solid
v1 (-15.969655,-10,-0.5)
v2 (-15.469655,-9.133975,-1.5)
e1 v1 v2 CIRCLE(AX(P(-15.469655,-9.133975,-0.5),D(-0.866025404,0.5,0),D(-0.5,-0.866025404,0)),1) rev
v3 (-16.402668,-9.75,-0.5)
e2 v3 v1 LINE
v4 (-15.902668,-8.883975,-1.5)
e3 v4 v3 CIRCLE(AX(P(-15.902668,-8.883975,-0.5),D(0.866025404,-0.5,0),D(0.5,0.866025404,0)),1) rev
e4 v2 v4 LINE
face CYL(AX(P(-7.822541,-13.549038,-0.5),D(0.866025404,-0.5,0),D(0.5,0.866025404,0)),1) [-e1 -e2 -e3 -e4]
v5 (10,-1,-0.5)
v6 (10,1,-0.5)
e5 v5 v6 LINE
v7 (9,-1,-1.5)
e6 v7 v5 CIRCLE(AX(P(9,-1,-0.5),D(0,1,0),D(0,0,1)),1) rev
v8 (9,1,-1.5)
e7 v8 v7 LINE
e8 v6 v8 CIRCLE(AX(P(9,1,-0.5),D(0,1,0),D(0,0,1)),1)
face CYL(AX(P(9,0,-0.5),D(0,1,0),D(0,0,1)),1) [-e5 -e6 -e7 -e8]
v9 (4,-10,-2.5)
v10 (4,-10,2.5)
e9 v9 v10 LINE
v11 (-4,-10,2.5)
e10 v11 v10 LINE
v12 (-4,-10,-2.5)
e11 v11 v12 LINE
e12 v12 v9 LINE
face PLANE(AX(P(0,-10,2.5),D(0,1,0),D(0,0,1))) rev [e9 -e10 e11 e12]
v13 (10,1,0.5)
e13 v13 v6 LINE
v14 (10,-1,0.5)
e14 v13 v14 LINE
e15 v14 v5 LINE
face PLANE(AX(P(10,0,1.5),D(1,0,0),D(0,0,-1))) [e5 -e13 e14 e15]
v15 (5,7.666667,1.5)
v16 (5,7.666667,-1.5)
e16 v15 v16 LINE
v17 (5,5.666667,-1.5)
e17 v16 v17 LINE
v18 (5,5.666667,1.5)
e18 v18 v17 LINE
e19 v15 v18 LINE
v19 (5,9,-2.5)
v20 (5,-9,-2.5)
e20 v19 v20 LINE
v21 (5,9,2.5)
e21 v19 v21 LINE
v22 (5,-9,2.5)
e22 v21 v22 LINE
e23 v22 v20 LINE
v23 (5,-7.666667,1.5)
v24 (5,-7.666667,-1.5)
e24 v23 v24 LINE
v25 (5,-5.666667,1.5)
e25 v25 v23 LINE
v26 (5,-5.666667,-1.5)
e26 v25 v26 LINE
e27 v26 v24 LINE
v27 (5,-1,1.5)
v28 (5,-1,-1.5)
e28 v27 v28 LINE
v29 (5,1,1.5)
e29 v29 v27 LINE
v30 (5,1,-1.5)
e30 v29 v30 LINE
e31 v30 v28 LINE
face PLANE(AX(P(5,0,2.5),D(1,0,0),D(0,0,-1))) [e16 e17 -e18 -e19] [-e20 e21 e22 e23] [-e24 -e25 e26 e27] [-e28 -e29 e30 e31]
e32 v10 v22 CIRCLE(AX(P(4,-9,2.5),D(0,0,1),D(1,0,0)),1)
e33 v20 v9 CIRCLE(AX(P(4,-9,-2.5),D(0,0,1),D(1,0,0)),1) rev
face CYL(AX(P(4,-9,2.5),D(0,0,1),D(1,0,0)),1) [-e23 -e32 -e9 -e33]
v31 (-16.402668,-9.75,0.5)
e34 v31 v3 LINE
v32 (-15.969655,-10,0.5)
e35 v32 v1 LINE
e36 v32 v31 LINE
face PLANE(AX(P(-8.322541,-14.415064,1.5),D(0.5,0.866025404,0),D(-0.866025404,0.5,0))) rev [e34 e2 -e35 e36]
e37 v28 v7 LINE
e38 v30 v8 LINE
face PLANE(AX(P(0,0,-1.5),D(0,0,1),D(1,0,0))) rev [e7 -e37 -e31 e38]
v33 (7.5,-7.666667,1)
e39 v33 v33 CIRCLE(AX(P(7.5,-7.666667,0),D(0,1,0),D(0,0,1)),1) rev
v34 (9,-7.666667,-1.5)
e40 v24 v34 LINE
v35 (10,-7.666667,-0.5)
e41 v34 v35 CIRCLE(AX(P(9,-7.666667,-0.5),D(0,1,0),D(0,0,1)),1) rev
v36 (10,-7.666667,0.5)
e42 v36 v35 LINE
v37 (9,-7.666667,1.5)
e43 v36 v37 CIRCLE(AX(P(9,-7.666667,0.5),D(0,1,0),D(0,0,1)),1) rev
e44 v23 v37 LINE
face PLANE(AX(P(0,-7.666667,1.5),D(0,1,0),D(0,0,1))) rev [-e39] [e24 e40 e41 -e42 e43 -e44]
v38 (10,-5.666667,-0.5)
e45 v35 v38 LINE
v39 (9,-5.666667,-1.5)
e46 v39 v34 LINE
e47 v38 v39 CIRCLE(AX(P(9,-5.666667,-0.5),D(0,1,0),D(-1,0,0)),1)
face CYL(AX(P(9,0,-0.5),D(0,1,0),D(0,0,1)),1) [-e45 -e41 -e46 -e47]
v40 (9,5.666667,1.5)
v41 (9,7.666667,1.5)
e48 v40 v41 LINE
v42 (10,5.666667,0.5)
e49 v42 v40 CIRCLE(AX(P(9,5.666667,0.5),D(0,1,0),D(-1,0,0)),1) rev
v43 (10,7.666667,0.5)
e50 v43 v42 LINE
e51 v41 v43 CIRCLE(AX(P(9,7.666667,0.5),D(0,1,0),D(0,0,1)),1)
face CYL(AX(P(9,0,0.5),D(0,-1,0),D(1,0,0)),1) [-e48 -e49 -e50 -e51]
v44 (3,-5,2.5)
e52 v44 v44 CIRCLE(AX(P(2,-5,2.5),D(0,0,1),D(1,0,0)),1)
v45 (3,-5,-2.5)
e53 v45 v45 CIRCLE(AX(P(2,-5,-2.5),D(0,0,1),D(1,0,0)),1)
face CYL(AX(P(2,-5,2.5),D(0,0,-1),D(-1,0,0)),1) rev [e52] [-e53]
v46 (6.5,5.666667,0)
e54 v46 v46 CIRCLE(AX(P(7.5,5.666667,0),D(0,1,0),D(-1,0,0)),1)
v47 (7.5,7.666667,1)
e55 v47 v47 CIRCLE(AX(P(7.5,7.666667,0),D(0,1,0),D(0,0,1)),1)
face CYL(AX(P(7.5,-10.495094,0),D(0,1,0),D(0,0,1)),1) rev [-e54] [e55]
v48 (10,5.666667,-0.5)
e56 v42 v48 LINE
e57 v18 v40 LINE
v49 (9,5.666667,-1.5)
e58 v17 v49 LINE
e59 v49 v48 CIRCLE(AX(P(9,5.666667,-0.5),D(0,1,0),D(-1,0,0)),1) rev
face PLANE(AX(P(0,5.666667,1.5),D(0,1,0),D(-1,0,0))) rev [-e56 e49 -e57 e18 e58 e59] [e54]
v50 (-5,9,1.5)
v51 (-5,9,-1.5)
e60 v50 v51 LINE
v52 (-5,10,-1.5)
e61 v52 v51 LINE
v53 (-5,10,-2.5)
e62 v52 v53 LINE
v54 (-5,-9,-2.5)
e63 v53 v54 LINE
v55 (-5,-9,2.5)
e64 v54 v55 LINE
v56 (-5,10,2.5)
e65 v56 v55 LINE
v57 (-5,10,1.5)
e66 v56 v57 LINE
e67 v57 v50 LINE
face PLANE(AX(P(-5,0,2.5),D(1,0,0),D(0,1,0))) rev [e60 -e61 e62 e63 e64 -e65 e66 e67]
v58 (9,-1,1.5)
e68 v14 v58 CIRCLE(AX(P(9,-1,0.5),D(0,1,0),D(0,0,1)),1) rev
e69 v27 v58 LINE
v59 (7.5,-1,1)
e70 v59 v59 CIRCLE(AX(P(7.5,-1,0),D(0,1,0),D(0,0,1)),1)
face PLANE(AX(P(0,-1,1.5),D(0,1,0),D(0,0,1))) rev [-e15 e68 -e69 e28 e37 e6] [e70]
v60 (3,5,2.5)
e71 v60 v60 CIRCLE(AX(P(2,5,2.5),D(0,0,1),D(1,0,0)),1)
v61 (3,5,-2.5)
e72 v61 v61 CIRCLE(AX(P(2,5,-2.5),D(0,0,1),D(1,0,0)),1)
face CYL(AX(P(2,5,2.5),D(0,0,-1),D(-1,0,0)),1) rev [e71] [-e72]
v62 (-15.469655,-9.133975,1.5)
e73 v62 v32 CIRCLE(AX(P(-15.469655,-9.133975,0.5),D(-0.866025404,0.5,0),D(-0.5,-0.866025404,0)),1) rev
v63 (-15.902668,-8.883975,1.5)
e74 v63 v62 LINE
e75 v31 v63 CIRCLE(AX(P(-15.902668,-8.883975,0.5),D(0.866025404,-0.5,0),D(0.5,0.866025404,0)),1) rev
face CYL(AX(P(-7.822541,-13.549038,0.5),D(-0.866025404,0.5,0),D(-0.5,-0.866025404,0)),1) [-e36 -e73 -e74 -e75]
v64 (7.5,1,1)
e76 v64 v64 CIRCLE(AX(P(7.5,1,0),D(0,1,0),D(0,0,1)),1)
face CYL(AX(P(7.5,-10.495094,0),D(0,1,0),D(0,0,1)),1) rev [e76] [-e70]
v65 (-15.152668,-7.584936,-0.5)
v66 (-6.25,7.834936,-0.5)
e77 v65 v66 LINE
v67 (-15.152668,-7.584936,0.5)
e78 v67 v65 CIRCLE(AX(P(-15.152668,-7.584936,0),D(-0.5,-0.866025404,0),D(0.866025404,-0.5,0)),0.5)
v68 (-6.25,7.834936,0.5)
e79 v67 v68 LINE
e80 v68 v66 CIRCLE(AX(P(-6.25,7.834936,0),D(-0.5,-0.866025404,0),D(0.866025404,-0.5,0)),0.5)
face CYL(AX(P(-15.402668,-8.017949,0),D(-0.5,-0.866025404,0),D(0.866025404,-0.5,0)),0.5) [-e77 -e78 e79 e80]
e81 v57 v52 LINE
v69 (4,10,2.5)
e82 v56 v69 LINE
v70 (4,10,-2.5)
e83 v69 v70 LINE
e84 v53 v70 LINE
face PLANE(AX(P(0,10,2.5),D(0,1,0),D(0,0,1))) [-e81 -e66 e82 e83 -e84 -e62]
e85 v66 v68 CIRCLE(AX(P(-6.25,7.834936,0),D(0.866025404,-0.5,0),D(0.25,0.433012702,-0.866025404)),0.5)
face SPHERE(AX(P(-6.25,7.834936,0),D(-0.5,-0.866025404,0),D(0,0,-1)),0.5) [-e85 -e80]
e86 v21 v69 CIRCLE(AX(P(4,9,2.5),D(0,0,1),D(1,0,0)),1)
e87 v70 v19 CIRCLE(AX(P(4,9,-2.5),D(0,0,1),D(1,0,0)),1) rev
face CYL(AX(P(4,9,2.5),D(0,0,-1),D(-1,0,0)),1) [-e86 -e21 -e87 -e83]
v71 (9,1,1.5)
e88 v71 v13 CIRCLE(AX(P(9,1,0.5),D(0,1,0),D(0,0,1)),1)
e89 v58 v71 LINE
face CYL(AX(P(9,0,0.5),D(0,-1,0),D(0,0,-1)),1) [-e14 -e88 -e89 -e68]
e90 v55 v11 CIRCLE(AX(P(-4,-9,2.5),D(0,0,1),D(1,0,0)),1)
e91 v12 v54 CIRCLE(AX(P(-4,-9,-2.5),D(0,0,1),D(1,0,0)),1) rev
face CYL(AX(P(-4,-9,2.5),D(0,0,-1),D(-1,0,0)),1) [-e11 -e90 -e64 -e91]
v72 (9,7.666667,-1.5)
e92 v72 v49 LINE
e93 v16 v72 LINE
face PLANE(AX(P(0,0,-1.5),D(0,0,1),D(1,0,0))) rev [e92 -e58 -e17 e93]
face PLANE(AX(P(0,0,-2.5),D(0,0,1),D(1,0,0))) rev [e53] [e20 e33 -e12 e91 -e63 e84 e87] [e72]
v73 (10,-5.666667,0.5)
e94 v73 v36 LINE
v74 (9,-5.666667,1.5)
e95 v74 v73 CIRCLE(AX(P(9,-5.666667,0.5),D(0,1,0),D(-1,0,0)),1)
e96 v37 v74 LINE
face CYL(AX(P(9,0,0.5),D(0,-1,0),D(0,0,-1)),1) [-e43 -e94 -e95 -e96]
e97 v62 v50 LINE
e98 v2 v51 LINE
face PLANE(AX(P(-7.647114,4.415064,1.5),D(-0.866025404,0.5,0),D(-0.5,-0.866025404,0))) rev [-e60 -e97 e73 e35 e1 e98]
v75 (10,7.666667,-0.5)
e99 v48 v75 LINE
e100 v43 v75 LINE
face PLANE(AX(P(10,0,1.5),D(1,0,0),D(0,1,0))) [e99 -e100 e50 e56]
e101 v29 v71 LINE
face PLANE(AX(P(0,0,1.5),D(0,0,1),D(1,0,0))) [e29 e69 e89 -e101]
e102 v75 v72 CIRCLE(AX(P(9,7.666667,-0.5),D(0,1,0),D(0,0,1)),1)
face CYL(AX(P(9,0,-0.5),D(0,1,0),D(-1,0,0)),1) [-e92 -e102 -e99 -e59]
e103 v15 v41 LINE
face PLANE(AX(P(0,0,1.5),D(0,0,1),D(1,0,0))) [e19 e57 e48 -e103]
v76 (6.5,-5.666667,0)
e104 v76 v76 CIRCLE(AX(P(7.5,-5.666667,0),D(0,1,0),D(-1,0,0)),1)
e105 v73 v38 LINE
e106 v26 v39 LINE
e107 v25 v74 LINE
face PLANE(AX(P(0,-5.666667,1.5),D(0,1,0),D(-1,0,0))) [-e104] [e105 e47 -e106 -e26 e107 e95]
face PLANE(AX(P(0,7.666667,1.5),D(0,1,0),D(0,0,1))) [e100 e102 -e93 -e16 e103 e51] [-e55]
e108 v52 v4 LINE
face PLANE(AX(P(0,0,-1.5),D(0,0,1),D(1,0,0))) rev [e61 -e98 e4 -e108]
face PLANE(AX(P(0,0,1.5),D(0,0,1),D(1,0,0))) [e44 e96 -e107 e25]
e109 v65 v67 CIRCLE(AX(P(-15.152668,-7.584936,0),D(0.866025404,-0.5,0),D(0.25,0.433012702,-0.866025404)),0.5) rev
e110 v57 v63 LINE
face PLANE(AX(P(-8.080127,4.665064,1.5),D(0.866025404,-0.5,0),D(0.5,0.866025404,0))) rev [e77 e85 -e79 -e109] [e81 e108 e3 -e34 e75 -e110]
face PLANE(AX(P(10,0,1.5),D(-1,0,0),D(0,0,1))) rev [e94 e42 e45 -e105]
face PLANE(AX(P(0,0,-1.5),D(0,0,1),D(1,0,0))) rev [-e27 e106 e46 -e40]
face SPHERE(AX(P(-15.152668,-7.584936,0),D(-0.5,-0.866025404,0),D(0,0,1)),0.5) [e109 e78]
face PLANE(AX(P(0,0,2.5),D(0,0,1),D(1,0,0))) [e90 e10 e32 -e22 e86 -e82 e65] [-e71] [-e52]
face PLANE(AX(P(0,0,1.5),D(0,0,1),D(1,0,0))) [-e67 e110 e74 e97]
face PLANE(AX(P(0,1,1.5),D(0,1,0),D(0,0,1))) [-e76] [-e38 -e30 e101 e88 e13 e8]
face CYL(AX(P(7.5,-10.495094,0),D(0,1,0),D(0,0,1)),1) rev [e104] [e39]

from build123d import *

# Parameters (mm, degrees)
ESQUISSE1_W             = 10
ESQUISSE1_H             = 20
ESQUISSE1_R             = 1
BOSS_EXTRU_1_DEPTH      = 2.5
ESQUISSE1_3_W           = 5
ESQUISSE1_3_H           = 2
BOSS_EXTRU_2_DEPTH      = 1.5
BOSS_EXTRU_3_DEPTH      = 1.5
ENL_V_MAT_EXTRU_1_REACH = 26.237
ESQUISSE3_R             = 1
CONG_1_R                = 1
CONG_2_R                = 1


# Read off the part's stored shape, not the designer's step: Révolution1
with BuildPart() as part:
    # Esquisse1 → Boss.-Extru.1 (new, symmetric)
    with BuildSketch(Plane.XY):
        Rectangle(ESQUISSE1_W, ESQUISSE1_H)
        with Locations((2, -5)):
            Circle(ESQUISSE1_R, mode=Mode.SUBTRACT)
        with Locations((2, 5)):
            Circle(ESQUISSE1_R, mode=Mode.SUBTRACT)
    extrude(amount=BOSS_EXTRU_1_DEPTH, both=True)

    # Esquisse1<3> → Boss.-Extru.2 (add, symmetric)
    with BuildSketch(Plane.XY):
        with Locations((7.5, 6.666666667)):
            Rectangle(ESQUISSE1_3_W, ESQUISSE1_3_H)
        with Locations((7.5, 0)):
            Rectangle(ESQUISSE1_3_W, ESQUISSE1_3_H)
        with Locations((7.5, -6.666666667)):
            Rectangle(ESQUISSE1_3_W, ESQUISSE1_3_H)
    extrude(amount=BOSS_EXTRU_2_DEPTH, both=True)

    # Esquisse1<5> → Boss.-Extru.3 (add, symmetric)
    with BuildSketch(Plane.XY):
        Polygon((-5, 9), (-5, 10), (-16.402667816, -9.75), (-15.969655115, -10), align=None)
    extrude(amount=BOSS_EXTRU_3_DEPTH, both=True)

    # Révolution1 outline → Révolution1 (revolve)
    with BuildSketch(Plane(origin=(-8.080127019, 4.665063509, 0), x_dir=(0.8660254037844386, -0.4999999999999999, 0), z_dir=(0, 0, 1))):
        with BuildLine():
            Line((0.5, -14.145081595), (0.5, 3.660254038))
            ThreePointArc((0.5, 3.660254038), (0.35355339, 4.013807428), (0, 4.160254038))
            Line((0, 4.160254038), (0, -14.645081595))
            ThreePointArc((0, -14.645081595), (0.353553391, -14.498634986), (0.5, -14.145081595))
        make_face()
    revolve(axis=Axis((-8.080127019, 4.665063509, 0), (0.4999999999999999, 0.8660254037844386, 0)))

    # Enlèv. mat.-Extru.1: up to this face of the body (flat: up to its plane)
    enl_v_mat_extru_1_end = Plane(part.part.faces().sort_by_distance((7.5, -7.666666667, 0))[0])
    # Esquisse3 → Enlèv. mat.-Extru.1 (cut, up to the picked face)
    with BuildSketch(Plane(origin=(0, 7.666666667, 0), x_dir=(1, 0, 0), z_dir=(0, 1, 0)), mode=Mode.PRIVATE) as enl_v_mat_extru_1_sk1:
        with Locations(Location((7.5, 0, 0), (0, 0, 270))):
            Circle(ESQUISSE3_R)
    enl_v_mat_extru_1_tool1 = split(extrude(enl_v_mat_extru_1_sk1.sketch, amount=-ENL_V_MAT_EXTRU_1_REACH, mode=Mode.PRIVATE), bisect_by=enl_v_mat_extru_1_end, keep=Keep.BOTH, mode=Mode.PRIVATE)
    add(enl_v_mat_extru_1_tool1.solids().sort_by(Axis((7.5, 7.666667, 0), (0, -1, 0)))[0], mode=Mode.SUBTRACT)

    # Congé1
    cong_1_edges = [part.edges().sort_by_distance(p)[0] for p in [
        (5, -10, 0),
        (-5, -10, 0),
        (5, 10, 0),
        (-16.186161466, -9.875, -1.5),
        (-16.186161466, -9.875, 1.5),
    ]]
    fillet(cong_1_edges, radius=CONG_1_R)

    # Congé2
    cong_2_edges = [part.edges().sort_by_distance(p)[0] for p in [
        (10, 6.666666667, 1.5),
        (10, 6.666666667, -1.5),
        (10, 0, 1.5),
        (10, 0, -1.5),
        (10, -6.666666667, -1.5),
        (10, -6.666666667, 1.5),
    ]]
    fillet(cong_2_edges, radius=CONG_2_R)


solid = part.part
